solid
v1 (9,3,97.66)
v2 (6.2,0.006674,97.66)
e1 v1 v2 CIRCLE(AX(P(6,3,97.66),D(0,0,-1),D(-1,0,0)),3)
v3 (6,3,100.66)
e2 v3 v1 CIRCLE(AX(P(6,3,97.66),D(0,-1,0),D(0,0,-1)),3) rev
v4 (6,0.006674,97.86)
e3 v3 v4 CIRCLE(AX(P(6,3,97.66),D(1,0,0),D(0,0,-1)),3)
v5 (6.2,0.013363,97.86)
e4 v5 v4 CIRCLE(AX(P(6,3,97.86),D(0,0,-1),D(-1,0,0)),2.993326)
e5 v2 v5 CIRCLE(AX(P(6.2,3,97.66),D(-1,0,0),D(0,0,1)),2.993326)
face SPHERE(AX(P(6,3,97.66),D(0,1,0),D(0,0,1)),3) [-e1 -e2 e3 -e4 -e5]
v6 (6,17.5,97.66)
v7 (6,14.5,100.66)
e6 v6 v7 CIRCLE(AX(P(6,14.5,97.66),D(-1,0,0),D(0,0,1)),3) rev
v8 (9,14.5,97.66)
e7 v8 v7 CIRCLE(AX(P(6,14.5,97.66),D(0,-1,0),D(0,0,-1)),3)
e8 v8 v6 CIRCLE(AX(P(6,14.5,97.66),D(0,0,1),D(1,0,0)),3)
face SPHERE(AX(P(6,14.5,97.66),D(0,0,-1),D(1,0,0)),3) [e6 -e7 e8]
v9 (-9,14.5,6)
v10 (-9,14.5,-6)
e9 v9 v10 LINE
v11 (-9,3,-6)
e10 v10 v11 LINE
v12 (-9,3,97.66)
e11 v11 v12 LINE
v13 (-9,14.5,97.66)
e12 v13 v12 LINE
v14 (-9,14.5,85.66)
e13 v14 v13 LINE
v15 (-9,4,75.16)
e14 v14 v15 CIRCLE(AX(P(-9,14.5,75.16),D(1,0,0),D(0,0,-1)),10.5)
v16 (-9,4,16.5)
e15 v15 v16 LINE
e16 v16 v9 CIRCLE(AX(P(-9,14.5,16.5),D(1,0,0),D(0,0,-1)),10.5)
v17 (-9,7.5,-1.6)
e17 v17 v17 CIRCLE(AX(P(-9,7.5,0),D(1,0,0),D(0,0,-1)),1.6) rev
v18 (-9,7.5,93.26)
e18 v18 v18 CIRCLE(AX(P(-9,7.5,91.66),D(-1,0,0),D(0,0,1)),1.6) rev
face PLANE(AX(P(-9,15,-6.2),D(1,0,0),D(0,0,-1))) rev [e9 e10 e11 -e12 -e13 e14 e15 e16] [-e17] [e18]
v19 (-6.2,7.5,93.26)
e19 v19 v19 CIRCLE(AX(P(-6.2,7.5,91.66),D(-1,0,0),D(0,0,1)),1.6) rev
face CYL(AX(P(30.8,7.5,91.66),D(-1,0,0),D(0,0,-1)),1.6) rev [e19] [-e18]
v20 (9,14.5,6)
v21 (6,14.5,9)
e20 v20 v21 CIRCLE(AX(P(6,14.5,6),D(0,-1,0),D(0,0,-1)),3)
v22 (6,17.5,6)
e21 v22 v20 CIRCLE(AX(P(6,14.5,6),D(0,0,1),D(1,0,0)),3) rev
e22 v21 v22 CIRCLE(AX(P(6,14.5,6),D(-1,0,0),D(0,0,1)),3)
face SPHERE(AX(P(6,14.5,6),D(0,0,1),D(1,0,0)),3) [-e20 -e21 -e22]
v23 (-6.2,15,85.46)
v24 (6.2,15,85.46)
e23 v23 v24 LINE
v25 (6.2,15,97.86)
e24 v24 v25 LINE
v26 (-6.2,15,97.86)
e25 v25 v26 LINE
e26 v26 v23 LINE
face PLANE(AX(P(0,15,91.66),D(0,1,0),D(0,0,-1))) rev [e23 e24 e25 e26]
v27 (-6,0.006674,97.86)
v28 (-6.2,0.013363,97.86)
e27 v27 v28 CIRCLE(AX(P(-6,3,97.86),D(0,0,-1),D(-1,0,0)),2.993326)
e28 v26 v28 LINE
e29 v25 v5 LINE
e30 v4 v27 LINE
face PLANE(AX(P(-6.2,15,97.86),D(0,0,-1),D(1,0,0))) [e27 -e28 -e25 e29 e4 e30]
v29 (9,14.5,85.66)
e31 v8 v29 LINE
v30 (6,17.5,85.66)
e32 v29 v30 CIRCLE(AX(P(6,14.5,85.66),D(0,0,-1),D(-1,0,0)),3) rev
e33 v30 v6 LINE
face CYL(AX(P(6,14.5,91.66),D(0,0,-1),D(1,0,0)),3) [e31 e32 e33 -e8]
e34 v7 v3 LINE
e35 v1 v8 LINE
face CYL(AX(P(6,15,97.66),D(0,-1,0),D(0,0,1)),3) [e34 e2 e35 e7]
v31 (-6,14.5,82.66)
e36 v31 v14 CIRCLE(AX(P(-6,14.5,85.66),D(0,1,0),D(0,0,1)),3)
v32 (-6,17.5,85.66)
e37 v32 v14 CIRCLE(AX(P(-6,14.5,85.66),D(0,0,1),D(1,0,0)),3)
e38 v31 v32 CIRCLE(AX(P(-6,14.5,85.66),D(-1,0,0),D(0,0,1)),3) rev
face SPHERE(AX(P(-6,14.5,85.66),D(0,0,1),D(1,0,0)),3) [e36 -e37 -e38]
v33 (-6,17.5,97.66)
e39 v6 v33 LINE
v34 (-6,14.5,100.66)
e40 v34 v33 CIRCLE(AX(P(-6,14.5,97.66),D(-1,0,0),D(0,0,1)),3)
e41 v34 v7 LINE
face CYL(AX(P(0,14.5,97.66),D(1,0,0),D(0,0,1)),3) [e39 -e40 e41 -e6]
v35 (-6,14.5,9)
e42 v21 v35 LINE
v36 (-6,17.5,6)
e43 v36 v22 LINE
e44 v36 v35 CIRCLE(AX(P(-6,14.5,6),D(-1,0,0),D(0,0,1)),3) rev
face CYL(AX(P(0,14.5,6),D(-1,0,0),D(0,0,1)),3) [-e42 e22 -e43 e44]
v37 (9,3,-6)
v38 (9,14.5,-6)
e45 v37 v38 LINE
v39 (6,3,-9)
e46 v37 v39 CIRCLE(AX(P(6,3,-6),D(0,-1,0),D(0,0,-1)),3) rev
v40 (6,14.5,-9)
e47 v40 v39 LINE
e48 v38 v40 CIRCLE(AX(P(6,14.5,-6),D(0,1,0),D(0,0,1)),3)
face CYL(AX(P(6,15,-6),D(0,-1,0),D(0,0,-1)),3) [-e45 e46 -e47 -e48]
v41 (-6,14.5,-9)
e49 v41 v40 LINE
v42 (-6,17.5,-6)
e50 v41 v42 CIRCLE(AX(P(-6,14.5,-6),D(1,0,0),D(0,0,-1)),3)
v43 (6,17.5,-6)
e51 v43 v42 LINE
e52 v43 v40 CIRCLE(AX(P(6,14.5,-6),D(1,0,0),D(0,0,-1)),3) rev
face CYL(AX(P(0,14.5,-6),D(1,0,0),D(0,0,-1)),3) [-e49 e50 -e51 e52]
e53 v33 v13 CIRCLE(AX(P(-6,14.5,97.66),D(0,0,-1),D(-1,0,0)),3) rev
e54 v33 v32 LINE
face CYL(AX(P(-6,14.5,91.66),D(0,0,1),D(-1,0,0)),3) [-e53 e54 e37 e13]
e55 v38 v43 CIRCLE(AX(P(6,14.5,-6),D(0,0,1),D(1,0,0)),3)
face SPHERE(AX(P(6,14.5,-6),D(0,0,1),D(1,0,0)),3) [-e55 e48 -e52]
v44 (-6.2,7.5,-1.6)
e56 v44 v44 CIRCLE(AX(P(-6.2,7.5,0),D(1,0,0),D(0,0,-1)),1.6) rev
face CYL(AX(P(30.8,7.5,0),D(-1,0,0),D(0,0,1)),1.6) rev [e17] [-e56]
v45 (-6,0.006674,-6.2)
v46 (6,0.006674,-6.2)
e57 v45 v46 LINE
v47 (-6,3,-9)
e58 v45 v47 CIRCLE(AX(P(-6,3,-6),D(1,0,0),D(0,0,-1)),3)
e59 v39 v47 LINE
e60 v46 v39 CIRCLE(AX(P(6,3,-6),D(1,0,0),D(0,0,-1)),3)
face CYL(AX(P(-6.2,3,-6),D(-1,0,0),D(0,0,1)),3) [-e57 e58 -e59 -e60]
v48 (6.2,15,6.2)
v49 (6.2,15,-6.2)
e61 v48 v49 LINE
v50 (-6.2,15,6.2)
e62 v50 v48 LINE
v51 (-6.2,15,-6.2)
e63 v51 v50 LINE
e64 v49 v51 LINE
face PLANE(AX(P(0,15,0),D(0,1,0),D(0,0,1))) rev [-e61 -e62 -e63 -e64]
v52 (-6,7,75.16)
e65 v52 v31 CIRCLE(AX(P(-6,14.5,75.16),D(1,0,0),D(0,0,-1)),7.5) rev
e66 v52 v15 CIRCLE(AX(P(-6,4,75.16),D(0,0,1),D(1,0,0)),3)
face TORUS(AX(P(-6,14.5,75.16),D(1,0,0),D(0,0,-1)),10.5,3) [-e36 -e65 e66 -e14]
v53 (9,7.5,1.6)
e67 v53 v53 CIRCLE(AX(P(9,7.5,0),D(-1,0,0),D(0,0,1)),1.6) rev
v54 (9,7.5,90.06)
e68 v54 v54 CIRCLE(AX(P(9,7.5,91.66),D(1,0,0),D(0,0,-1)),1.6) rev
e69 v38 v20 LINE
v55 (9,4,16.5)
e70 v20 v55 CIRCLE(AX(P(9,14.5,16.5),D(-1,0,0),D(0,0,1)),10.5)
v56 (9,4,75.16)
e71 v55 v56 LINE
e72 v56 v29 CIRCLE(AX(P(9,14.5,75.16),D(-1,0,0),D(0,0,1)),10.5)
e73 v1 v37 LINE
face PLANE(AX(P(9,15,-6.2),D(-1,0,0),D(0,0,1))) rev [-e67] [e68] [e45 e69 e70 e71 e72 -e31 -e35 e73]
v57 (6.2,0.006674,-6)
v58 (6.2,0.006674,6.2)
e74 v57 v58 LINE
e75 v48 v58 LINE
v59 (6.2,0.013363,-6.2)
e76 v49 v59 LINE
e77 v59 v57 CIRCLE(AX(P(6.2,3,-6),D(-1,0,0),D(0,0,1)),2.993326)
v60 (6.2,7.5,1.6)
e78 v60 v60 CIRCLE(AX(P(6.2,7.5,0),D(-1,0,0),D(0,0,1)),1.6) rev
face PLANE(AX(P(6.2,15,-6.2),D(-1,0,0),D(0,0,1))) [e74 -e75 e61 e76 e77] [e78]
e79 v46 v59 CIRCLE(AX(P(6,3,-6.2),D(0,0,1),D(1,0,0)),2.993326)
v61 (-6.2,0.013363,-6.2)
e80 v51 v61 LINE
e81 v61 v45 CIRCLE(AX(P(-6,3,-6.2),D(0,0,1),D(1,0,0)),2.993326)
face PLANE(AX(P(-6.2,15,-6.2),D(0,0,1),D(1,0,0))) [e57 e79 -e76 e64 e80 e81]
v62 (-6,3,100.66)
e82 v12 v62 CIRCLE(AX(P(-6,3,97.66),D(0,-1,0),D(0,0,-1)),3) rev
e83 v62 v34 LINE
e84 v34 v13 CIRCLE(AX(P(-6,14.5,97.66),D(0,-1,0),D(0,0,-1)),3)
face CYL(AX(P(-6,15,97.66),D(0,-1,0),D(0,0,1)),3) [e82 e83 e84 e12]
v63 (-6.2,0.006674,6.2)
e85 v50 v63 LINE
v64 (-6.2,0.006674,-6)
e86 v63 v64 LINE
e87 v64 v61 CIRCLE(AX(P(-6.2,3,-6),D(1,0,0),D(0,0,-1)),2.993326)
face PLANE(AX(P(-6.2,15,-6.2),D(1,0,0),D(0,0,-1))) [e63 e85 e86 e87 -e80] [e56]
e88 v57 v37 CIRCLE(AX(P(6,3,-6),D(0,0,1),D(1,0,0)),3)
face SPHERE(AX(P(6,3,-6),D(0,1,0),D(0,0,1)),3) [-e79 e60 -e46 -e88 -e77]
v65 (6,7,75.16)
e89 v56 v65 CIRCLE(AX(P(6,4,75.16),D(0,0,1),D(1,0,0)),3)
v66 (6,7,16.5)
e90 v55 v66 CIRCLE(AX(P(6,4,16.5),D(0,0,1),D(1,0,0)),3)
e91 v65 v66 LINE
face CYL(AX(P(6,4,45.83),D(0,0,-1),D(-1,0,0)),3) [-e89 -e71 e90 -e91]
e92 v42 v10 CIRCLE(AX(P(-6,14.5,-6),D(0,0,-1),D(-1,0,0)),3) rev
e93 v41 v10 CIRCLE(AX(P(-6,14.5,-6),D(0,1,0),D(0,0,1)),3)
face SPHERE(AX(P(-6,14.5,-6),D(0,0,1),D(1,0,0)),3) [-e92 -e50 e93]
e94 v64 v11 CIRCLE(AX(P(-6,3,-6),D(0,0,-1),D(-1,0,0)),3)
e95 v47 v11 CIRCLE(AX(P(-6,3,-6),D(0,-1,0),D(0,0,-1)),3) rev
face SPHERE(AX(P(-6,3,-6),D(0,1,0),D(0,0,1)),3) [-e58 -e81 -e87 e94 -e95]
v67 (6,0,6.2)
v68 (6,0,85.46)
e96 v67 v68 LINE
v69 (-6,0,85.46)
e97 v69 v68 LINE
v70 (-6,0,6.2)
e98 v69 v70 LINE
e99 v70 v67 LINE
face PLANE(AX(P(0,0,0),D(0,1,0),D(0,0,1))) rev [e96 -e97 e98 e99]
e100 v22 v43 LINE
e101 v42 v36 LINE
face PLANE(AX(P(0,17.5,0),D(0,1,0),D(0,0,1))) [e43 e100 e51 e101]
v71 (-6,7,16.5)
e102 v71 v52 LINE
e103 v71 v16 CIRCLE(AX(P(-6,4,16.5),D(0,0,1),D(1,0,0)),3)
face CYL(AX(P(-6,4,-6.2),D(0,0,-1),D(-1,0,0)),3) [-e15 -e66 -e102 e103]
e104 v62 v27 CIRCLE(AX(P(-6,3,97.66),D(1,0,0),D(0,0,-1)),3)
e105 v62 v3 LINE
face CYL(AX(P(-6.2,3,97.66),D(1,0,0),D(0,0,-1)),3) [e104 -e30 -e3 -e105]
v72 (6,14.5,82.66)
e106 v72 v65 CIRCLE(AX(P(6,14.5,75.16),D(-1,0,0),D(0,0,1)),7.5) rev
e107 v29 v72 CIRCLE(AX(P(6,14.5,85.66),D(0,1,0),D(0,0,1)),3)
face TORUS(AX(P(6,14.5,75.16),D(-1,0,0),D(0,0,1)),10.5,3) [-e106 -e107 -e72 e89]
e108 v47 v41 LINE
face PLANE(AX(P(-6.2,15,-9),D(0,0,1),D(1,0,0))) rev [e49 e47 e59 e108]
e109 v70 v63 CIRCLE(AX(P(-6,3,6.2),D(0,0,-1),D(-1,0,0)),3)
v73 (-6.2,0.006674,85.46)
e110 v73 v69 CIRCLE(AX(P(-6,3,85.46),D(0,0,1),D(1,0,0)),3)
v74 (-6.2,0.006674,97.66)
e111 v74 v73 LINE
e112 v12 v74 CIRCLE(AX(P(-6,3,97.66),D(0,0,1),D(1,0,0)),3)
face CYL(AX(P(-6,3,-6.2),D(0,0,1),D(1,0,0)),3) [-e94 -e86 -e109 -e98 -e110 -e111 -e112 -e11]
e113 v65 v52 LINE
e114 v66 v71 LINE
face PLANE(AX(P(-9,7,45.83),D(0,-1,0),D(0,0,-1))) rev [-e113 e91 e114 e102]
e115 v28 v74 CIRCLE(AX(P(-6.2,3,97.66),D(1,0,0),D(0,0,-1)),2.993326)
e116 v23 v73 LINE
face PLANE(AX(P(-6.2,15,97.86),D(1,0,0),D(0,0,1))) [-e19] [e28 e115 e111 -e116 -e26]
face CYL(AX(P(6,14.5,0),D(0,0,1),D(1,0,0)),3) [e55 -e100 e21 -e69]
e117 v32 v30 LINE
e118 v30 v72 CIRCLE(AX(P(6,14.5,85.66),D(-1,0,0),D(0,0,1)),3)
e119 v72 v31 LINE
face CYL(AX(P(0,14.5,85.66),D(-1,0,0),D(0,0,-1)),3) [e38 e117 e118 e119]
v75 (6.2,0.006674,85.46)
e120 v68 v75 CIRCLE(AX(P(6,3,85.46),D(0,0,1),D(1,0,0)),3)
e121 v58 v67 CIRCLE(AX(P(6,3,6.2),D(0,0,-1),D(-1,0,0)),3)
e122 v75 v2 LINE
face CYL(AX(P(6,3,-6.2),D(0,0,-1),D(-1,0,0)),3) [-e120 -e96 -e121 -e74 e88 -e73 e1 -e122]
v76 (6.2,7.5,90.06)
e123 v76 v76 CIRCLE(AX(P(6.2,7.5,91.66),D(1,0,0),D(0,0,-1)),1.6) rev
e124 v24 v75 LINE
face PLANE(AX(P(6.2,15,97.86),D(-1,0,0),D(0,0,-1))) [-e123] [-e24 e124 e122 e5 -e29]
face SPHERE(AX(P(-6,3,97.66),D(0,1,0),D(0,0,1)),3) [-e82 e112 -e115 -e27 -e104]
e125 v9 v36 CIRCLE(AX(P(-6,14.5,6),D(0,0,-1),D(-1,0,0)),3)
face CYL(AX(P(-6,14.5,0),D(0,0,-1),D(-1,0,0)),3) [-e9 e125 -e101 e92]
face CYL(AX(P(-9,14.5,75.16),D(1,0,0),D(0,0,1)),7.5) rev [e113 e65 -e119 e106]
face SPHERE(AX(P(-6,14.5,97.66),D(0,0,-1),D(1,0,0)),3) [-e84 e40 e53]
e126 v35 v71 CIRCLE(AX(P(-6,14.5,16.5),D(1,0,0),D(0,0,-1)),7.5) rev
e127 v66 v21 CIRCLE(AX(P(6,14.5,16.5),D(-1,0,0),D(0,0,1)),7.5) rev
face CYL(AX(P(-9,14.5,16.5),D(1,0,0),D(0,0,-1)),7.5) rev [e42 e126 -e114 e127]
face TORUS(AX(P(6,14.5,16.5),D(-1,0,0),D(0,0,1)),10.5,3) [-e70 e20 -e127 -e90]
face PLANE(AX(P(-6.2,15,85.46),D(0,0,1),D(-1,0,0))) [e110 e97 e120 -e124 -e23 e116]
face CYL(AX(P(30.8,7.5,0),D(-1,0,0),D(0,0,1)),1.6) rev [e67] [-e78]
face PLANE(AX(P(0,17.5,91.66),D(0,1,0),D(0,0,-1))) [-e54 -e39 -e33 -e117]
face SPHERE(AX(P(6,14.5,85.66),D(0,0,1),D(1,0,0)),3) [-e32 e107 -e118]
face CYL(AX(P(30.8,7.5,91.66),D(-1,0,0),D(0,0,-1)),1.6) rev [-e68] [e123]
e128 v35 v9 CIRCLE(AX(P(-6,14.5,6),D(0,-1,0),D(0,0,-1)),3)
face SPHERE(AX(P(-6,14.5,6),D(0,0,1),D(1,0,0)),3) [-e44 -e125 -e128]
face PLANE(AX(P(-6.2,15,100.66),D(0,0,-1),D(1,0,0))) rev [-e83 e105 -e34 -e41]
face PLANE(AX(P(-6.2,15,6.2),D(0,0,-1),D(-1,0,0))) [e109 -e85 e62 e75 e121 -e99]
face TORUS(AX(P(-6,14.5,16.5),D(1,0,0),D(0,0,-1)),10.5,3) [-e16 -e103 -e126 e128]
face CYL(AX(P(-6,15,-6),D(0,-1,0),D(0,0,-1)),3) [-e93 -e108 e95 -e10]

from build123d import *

# Parameters (mm, degrees)
SKETCH_1_W               = 18
SKETCH_1_H               = 18
SKETCH_1_W_2             = 12.4
SKETCH_1_H_2             = 12.4
EXTRUDE_1_DEPTH          = 15
SKETCH_2_W               = 18
SKETCH_2_H               = 18
EXTRUDE_1_2_DEPTH        = 2.5
FILLET_1_R               = 3
SKETCH_3_W               = 18
SKETCH_3_H               = 7
EXTRUDE_2_DEPTH          = 36.83
FILLET_2_R               = 7.5
FILLET_3_R               = 3
CUT_EXTRUDE_1_DEPTH      = 37
CUT_EXTRUDE_1_DEPTH_BACK = 37
SKETCH_6_R               = 1.6
FILLET_4_R               = 3


# Some blends are built 0.0001 mm under size
with BuildPart() as part:
    # 草图1 → Extrude 1 (new body)
    with BuildSketch(Plane(origin=(0, 0, 0), x_dir=(1, 0, 0), z_dir=(0, 1, 0))):
        Rectangle(SKETCH_1_W, SKETCH_1_H)
        Rectangle(SKETCH_1_W_2, SKETCH_1_H_2, mode=Mode.SUBTRACT)
    extrude(amount=EXTRUDE_1_DEPTH)

    # 草图2 → Extrude 1 2 (add)
    with BuildSketch(Plane(origin=(0, 15, 0), x_dir=(1, 0, 0), z_dir=(0, 1, 0))):
        Rectangle(SKETCH_2_W, SKETCH_2_H)
    extrude(amount=EXTRUDE_1_2_DEPTH)

    # 圆角1
    fillet_1_edges = [part.edges().sort_by_distance(p)[0] for p in [
        (-9, 17.5, 0),
        (0, 17.5, 9),
        (9, 17.5, 0),
        (0, 17.5, -9),
    ]]
    fillet(fillet_1_edges, radius=FILLET_1_R)

    # 草图3 → 凸台-拉伸2 (add)
    with BuildSketch(Plane.XY.offset(9)):
        with Locations((0, 3.5)):
            Rectangle(SKETCH_3_W, SKETCH_3_H)
    extrude(amount=EXTRUDE_2_DEPTH)

    # 圆角2
    fillet_2_edges = [part.edges().sort_by_distance(p)[0] for p in [
        (0, 7, 9),
    ]]
    fillet(fillet_2_edges, radius=FILLET_2_R - 0.0001)  # a hair under: the kernel refuses the full size

    # 圆角3
    # the kernel refuses this fillet: 3 mm, written as the material it takes off along each edge
    with BuildSketch(Plane(origin=(6, 14.5, -6), x_dir=(0, 0, -1), z_dir=(1, 0, 0))) as fillet_3_piece_1_section:
        Polygon((0, 0), (FILLET_3_R, 0), (FILLET_3_R, FILLET_3_R), (0, FILLET_3_R), align=None)
    fillet_3_piece_1 = extrude(amount=FILLET_3_R, mode=Mode.PRIVATE)
    fillet_3_piece_1 = fillet_3_piece_1 - Plane(origin=(6, 14.5, -6), x_dir=(0, -0.7071067811865475, 0.7071067811865475), z_dir=(1, 0, 0)) * Sphere(FILLET_3_R, mode=Mode.PRIVATE)
    add(fillet_3_piece_1, mode=Mode.SUBTRACT)
    with BuildSketch(Plane(origin=(-6, 14.5, -6), x_dir=(0, 0, -1), z_dir=(-1, 0, 0))) as fillet_3_piece_2_section:
        Polygon((0, 0), (FILLET_3_R, 0), (FILLET_3_R, -FILLET_3_R), (0, -FILLET_3_R), align=None)
    fillet_3_piece_2 = extrude(amount=FILLET_3_R, mode=Mode.PRIVATE)
    fillet_3_piece_2 = fillet_3_piece_2 - Plane(origin=(-6, 14.5, -6), x_dir=(0, -0.7071067811865475, 0.7071067811865475), z_dir=(-1, 0, 0)) * Sphere(FILLET_3_R, mode=Mode.PRIVATE)
    add(fillet_3_piece_2, mode=Mode.SUBTRACT)
    with BuildSketch(Plane(origin=(-9, 14.5, -9), x_dir=(0, 0, 1), z_dir=(0, -1, 0)), Plane(origin=(9, -7.5, -9), x_dir=(0, 0, 1), z_dir=(0, 1, 0))) as fillet_3_piece_3:
        with BuildLine():
            CenterArc((FILLET_3_R, -FILLET_3_R), FILLET_3_R, 90, 90)
            Line((0, -FILLET_3_R), (0, 0))
            Line((0, 0), (FILLET_3_R, 0))
        make_face()
    extrude(amount=22, mode=Mode.SUBTRACT)

    # 草图6 → 切除-拉伸1 (cut, two sides: drawn at the far end of the back side and taken through both)
    with BuildSketch(Plane(origin=(-6.2, 0, 0), x_dir=(0, 0, -1), z_dir=(1, 0, 0)).offset(-CUT_EXTRUDE_1_DEPTH_BACK)):
        with Locations((0, 7.5)):
            Circle(SKETCH_6_R)
    extrude(amount=CUT_EXTRUDE_1_DEPTH + CUT_EXTRUDE_1_DEPTH_BACK, mode=Mode.SUBTRACT)

    # 镜向1: part across plane


with BuildPart() as part_1:
    add(part.part)
    add(part.part.mirror(Plane(origin=(0, 0, 45.83), x_dir=(1, 0, 0), z_dir=(0, 0, -1))))

    # 圆角4
    # the kernel refuses this fillet: 3 mm, written as the material it takes off along each edge
    with BuildSketch(Plane(origin=(6, 14.5, 85.66), x_dir=(0, 0, -1), z_dir=(1, 0, 0))) as fillet_4_piece_1_section:
        Polygon((0, 0), (FILLET_4_R, 0), (FILLET_4_R, FILLET_4_R), (0, FILLET_4_R), align=None)
    fillet_4_piece_1 = extrude(amount=FILLET_4_R, mode=Mode.PRIVATE)
    fillet_4_piece_1 = fillet_4_piece_1 - Plane(origin=(6, 14.5, 85.66), x_dir=(0, -0.7071067811865475, 0.7071067811865475), z_dir=(1, 0, 0)) * Sphere(FILLET_4_R, mode=Mode.PRIVATE)
    add(fillet_4_piece_1, mode=Mode.SUBTRACT)
    with BuildSketch(Plane(origin=(6, 14.5, 6), x_dir=(1, 0, 0), z_dir=(0, 0, 1))) as fillet_4_piece_2_section:
        Polygon((0, 0), (FILLET_4_R, 0), (FILLET_4_R, FILLET_4_R), (0, FILLET_4_R), align=None)
    fillet_4_piece_2 = extrude(amount=FILLET_4_R, mode=Mode.PRIVATE)
    fillet_4_piece_2 = fillet_4_piece_2 - Plane(origin=(6, 14.5, 6), x_dir=(-0.7071067811865475, -0.7071067811865475, 0), z_dir=(0, 0, 1)) * Sphere(FILLET_4_R, mode=Mode.PRIVATE)
    add(fillet_4_piece_2, mode=Mode.SUBTRACT)
    with BuildSketch(Plane(origin=(-6, 14.5, 85.66), x_dir=(-1, 0, 0), z_dir=(0, 0, -1))) as fillet_4_piece_3_section:
        Polygon((0, 0), (FILLET_4_R, 0), (FILLET_4_R, FILLET_4_R), (0, FILLET_4_R), align=None)
    fillet_4_piece_3 = extrude(amount=FILLET_4_R, mode=Mode.PRIVATE)
    fillet_4_piece_3 = fillet_4_piece_3 - Plane(origin=(-6, 14.5, 85.66), x_dir=(0.7071067811865475, -0.7071067811865475, 0), z_dir=(0, 0, -1)) * Sphere(FILLET_4_R, mode=Mode.PRIVATE)
    add(fillet_4_piece_3, mode=Mode.SUBTRACT)
    with BuildSketch(Plane(origin=(-6, 14.5, 6), x_dir=(-1, 0, 0), z_dir=(0, 0, 1))) as fillet_4_piece_4_section:
        Polygon((0, 0), (FILLET_4_R, 0), (FILLET_4_R, -FILLET_4_R), (0, -FILLET_4_R), align=None)
    fillet_4_piece_4 = extrude(amount=FILLET_4_R, mode=Mode.PRIVATE)
    fillet_4_piece_4 = fillet_4_piece_4 - Plane(origin=(-6, 14.5, 6), x_dir=(0.7071067811865475, -0.7071067811865475, 0), z_dir=(0, 0, 1)) * Sphere(FILLET_4_R, mode=Mode.PRIVATE)
    add(fillet_4_piece_4, mode=Mode.SUBTRACT)
    with BuildSketch(Plane(origin=(9, 14.4999, 75.1601), x_dir=(0, 0, 1), z_dir=(0, 1, 0))) as fillet_4_piece_5:
        with BuildLine():
            CenterArc((7.4999 + FILLET_4_R, -FILLET_4_R), FILLET_4_R, 90, 90)
            Line((7.4999, -FILLET_4_R), (7.4999, 0))
            Line((7.4999, 0), (7.4999 + FILLET_4_R, 0))
        make_face()
    revolve(axis=Axis((9, 14.4999, 75.1601), (1, 0, 0)), revolution_arc=90, mode=Mode.SUBTRACT)
    with BuildSketch(Plane(origin=(-9, 14.4999, 75.1601), x_dir=(0, 0, 1), z_dir=(0, 1, 0))) as fillet_4_piece_6:
        with BuildLine():
            CenterArc((7.4999 + FILLET_4_R, FILLET_4_R), FILLET_4_R, 180, 90)
            Line((7.4999 + FILLET_4_R, 0), (7.4999, 0))
            Line((7.4999, 0), (7.4999, FILLET_4_R))
        make_face()
    revolve(axis=Axis((-9, 14.4999, 75.1601), (1, 0, 0)), revolution_arc=90, mode=Mode.SUBTRACT)
    with BuildSketch(Plane(origin=(9, 14.4999, 16.4999), x_dir=(0, 0, -1), z_dir=(0, 1, 0))) as fillet_4_piece_7:
        with BuildLine():
            CenterArc((7.4999 + FILLET_4_R, FILLET_4_R), FILLET_4_R, 180, 90)
            Line((7.4999, FILLET_4_R), (7.4999, 0))
            Line((7.4999, 0), (7.4999 + FILLET_4_R, 0))
        make_face()
    revolve(axis=Axis((9, 14.4999, 16.4999), (-1, 0, 0)), revolution_arc=90, mode=Mode.SUBTRACT)
    with BuildSketch(Plane(origin=(-9, 14.4999, 16.4999), x_dir=(0, 0, -1), z_dir=(0, 1, 0))) as fillet_4_piece_8:
        with BuildLine():
            CenterArc((7.4999 + FILLET_4_R, -FILLET_4_R), FILLET_4_R, 90, 90)
            Line((7.4999 + FILLET_4_R, 0), (7.4999, 0))
            Line((7.4999, 0), (7.4999, -FILLET_4_R))
        make_face()
    revolve(axis=Axis((-9, 14.4999, 16.4999), (-1, 0, 0)), revolution_arc=90, mode=Mode.SUBTRACT)
    with BuildSketch(Plane(origin=(9, 0, 97.66), x_dir=(0, 1, 0), z_dir=(0, 0, -1))) as fillet_4_piece_9:
        with BuildLine():
            CenterArc((FILLET_4_R, -FILLET_4_R), FILLET_4_R, 90, 90)
            Line((0, -FILLET_4_R), (0, 0))
            Line((0, 0), (FILLET_4_R, 0))
        make_face()
    extrude(amount=103.66, mode=Mode.SUBTRACT)
    with BuildSketch(Plane(origin=(-9, 0, -6), x_dir=(1, 0, 0), z_dir=(0, 0, 1))) as fillet_4_piece_10:
        with BuildLine():
            CenterArc((FILLET_4_R, FILLET_4_R), FILLET_4_R, 180, 90)
            Line((0, FILLET_4_R), (0, 0))
            Line((0, 0), (FILLET_4_R, 0))
        make_face()
    extrude(amount=103.66, mode=Mode.SUBTRACT)
    with BuildSketch(Plane(origin=(9, 7, 16.4999), x_dir=(0, -1, 0), z_dir=(0, 0, 1))) as fillet_4_piece_11:
        with BuildLine():
            CenterArc((FILLET_4_R, -FILLET_4_R), FILLET_4_R, 90, 90)
            Line((0, -FILLET_4_R), (0, 0))
            Line((0, 0), (FILLET_4_R, 0))
        make_face()
    extrude(amount=58.6602, mode=Mode.SUBTRACT)
    with BuildSketch(Plane(origin=(-9, 7, 75.1601), x_dir=(1, 0, 0), z_dir=(0, 0, -1))) as fillet_4_piece_12:
        with BuildLine():
            CenterArc((FILLET_4_R, FILLET_4_R), FILLET_4_R, 180, 90)
            Line((0, FILLET_4_R), (0, 0))
            Line((0, 0), (FILLET_4_R, 0))
        make_face()
    extrude(amount=58.6602, mode=Mode.SUBTRACT)
    with BuildSketch(Plane(origin=(-6, 0, -6), x_dir=(0, 0, -1), z_dir=(1, 0, 0))) as fillet_4_piece_13:
        with BuildLine():
            CenterArc((3 - FILLET_4_R, FILLET_4_R), FILLET_4_R, 270, 90)
            Line((3 - FILLET_4_R, 0), (3, 0))
            Line((3, 0), (3, FILLET_4_R))
        make_face()
    revolve(axis=Axis((-6, 0, -6), (0, 1, 0)), revolution_arc=90, mode=Mode.SUBTRACT)
    with BuildSketch(Plane(origin=(-6, 0, 97.66), x_dir=(0, 0, 1), z_dir=(1, 0, 0))) as fillet_4_piece_14:
        with BuildLine():
            CenterArc((3 - FILLET_4_R, -FILLET_4_R), FILLET_4_R, 0, 90)
            Line((3, -FILLET_4_R), (3, 0))
            Line((3, 0), (3 - FILLET_4_R, 0))
        make_face()
    revolve(axis=Axis((-6, 0, 97.66), (0, -1, 0)), revolution_arc=90, mode=Mode.SUBTRACT)
    with BuildSketch(Plane(origin=(-6, 0, 100.66), x_dir=(0, 0, -1), z_dir=(1, 0, 0)), Plane(origin=(-6, 0, -9), x_dir=(0, 1, 0), z_dir=(1, 0, 0))) as fillet_4_piece_15:
        with BuildLine():
            CenterArc((FILLET_4_R, FILLET_4_R), FILLET_4_R, 180, 90)
            Line((0, FILLET_4_R), (0, 0))
            Line((0, 0), (FILLET_4_R, 0))
        make_face()
    extrude(amount=12, mode=Mode.SUBTRACT)
    with BuildSketch(Plane(origin=(6, 0, 97.66), x_dir=(0, 0, 1), z_dir=(-1, 0, 0))) as fillet_4_piece_16:
        with BuildLine():
            CenterArc((3 - FILLET_4_R, FILLET_4_R), FILLET_4_R, 270, 90)
            Line((3, FILLET_4_R), (3, 0))
            Line((3, 0), (3 - FILLET_4_R, 0))
        make_face()
    revolve(axis=Axis((6, 0, 97.66), (0, 1, 0)), revolution_arc=90, mode=Mode.SUBTRACT)
    with BuildSketch(Plane(origin=(6, 0, -6), x_dir=(0, 0, -1), z_dir=(-1, 0, 0))) as fillet_4_piece_17:
        with BuildLine():
            CenterArc((3 - FILLET_4_R, -FILLET_4_R), FILLET_4_R, 0, 90)
            Line((3 - FILLET_4_R, 0), (3, 0))
            Line((3, 0), (3, -FILLET_4_R))
        make_face()
    revolve(axis=Axis((6, 0, -6), (0, -1, 0)), revolution_arc=90, mode=Mode.SUBTRACT)
    with BuildSketch(Plane(origin=(-9, 14.5, 9), x_dir=(1, 0, 0), z_dir=(0, -1, 0)), Plane(origin=(9, 14.4999, 9), x_dir=(-1, 0, 0), z_dir=(0, 1, 0)), Plane(origin=(9, 14.4999, 82.66), x_dir=(0, 0, 1), z_dir=(0, 1, 0))) as fillet_4_piece_18:
        with BuildLine():
            CenterArc((FILLET_4_R, -FILLET_4_R), FILLET_4_R, 90, 90)
            Line((0, -FILLET_4_R), (0, 0))
            Line((0, 0), (FILLET_4_R, 0))
        make_face()
    extrude(amount=0.0001, mode=Mode.SUBTRACT)
    with BuildSketch(Plane(origin=(-9, 14.5, 82.66), x_dir=(1, 0, 0), z_dir=(0, -1, 0))) as fillet_4_piece_19:
        with BuildLine():
            CenterArc((FILLET_4_R, FILLET_4_R), FILLET_4_R, 180, 90)
            Line((0, FILLET_4_R), (0, 0))
            Line((0, 0), (FILLET_4_R, 0))
        make_face()
    extrude(amount=0.0001, mode=Mode.SUBTRACT)


solid = part_1.part
